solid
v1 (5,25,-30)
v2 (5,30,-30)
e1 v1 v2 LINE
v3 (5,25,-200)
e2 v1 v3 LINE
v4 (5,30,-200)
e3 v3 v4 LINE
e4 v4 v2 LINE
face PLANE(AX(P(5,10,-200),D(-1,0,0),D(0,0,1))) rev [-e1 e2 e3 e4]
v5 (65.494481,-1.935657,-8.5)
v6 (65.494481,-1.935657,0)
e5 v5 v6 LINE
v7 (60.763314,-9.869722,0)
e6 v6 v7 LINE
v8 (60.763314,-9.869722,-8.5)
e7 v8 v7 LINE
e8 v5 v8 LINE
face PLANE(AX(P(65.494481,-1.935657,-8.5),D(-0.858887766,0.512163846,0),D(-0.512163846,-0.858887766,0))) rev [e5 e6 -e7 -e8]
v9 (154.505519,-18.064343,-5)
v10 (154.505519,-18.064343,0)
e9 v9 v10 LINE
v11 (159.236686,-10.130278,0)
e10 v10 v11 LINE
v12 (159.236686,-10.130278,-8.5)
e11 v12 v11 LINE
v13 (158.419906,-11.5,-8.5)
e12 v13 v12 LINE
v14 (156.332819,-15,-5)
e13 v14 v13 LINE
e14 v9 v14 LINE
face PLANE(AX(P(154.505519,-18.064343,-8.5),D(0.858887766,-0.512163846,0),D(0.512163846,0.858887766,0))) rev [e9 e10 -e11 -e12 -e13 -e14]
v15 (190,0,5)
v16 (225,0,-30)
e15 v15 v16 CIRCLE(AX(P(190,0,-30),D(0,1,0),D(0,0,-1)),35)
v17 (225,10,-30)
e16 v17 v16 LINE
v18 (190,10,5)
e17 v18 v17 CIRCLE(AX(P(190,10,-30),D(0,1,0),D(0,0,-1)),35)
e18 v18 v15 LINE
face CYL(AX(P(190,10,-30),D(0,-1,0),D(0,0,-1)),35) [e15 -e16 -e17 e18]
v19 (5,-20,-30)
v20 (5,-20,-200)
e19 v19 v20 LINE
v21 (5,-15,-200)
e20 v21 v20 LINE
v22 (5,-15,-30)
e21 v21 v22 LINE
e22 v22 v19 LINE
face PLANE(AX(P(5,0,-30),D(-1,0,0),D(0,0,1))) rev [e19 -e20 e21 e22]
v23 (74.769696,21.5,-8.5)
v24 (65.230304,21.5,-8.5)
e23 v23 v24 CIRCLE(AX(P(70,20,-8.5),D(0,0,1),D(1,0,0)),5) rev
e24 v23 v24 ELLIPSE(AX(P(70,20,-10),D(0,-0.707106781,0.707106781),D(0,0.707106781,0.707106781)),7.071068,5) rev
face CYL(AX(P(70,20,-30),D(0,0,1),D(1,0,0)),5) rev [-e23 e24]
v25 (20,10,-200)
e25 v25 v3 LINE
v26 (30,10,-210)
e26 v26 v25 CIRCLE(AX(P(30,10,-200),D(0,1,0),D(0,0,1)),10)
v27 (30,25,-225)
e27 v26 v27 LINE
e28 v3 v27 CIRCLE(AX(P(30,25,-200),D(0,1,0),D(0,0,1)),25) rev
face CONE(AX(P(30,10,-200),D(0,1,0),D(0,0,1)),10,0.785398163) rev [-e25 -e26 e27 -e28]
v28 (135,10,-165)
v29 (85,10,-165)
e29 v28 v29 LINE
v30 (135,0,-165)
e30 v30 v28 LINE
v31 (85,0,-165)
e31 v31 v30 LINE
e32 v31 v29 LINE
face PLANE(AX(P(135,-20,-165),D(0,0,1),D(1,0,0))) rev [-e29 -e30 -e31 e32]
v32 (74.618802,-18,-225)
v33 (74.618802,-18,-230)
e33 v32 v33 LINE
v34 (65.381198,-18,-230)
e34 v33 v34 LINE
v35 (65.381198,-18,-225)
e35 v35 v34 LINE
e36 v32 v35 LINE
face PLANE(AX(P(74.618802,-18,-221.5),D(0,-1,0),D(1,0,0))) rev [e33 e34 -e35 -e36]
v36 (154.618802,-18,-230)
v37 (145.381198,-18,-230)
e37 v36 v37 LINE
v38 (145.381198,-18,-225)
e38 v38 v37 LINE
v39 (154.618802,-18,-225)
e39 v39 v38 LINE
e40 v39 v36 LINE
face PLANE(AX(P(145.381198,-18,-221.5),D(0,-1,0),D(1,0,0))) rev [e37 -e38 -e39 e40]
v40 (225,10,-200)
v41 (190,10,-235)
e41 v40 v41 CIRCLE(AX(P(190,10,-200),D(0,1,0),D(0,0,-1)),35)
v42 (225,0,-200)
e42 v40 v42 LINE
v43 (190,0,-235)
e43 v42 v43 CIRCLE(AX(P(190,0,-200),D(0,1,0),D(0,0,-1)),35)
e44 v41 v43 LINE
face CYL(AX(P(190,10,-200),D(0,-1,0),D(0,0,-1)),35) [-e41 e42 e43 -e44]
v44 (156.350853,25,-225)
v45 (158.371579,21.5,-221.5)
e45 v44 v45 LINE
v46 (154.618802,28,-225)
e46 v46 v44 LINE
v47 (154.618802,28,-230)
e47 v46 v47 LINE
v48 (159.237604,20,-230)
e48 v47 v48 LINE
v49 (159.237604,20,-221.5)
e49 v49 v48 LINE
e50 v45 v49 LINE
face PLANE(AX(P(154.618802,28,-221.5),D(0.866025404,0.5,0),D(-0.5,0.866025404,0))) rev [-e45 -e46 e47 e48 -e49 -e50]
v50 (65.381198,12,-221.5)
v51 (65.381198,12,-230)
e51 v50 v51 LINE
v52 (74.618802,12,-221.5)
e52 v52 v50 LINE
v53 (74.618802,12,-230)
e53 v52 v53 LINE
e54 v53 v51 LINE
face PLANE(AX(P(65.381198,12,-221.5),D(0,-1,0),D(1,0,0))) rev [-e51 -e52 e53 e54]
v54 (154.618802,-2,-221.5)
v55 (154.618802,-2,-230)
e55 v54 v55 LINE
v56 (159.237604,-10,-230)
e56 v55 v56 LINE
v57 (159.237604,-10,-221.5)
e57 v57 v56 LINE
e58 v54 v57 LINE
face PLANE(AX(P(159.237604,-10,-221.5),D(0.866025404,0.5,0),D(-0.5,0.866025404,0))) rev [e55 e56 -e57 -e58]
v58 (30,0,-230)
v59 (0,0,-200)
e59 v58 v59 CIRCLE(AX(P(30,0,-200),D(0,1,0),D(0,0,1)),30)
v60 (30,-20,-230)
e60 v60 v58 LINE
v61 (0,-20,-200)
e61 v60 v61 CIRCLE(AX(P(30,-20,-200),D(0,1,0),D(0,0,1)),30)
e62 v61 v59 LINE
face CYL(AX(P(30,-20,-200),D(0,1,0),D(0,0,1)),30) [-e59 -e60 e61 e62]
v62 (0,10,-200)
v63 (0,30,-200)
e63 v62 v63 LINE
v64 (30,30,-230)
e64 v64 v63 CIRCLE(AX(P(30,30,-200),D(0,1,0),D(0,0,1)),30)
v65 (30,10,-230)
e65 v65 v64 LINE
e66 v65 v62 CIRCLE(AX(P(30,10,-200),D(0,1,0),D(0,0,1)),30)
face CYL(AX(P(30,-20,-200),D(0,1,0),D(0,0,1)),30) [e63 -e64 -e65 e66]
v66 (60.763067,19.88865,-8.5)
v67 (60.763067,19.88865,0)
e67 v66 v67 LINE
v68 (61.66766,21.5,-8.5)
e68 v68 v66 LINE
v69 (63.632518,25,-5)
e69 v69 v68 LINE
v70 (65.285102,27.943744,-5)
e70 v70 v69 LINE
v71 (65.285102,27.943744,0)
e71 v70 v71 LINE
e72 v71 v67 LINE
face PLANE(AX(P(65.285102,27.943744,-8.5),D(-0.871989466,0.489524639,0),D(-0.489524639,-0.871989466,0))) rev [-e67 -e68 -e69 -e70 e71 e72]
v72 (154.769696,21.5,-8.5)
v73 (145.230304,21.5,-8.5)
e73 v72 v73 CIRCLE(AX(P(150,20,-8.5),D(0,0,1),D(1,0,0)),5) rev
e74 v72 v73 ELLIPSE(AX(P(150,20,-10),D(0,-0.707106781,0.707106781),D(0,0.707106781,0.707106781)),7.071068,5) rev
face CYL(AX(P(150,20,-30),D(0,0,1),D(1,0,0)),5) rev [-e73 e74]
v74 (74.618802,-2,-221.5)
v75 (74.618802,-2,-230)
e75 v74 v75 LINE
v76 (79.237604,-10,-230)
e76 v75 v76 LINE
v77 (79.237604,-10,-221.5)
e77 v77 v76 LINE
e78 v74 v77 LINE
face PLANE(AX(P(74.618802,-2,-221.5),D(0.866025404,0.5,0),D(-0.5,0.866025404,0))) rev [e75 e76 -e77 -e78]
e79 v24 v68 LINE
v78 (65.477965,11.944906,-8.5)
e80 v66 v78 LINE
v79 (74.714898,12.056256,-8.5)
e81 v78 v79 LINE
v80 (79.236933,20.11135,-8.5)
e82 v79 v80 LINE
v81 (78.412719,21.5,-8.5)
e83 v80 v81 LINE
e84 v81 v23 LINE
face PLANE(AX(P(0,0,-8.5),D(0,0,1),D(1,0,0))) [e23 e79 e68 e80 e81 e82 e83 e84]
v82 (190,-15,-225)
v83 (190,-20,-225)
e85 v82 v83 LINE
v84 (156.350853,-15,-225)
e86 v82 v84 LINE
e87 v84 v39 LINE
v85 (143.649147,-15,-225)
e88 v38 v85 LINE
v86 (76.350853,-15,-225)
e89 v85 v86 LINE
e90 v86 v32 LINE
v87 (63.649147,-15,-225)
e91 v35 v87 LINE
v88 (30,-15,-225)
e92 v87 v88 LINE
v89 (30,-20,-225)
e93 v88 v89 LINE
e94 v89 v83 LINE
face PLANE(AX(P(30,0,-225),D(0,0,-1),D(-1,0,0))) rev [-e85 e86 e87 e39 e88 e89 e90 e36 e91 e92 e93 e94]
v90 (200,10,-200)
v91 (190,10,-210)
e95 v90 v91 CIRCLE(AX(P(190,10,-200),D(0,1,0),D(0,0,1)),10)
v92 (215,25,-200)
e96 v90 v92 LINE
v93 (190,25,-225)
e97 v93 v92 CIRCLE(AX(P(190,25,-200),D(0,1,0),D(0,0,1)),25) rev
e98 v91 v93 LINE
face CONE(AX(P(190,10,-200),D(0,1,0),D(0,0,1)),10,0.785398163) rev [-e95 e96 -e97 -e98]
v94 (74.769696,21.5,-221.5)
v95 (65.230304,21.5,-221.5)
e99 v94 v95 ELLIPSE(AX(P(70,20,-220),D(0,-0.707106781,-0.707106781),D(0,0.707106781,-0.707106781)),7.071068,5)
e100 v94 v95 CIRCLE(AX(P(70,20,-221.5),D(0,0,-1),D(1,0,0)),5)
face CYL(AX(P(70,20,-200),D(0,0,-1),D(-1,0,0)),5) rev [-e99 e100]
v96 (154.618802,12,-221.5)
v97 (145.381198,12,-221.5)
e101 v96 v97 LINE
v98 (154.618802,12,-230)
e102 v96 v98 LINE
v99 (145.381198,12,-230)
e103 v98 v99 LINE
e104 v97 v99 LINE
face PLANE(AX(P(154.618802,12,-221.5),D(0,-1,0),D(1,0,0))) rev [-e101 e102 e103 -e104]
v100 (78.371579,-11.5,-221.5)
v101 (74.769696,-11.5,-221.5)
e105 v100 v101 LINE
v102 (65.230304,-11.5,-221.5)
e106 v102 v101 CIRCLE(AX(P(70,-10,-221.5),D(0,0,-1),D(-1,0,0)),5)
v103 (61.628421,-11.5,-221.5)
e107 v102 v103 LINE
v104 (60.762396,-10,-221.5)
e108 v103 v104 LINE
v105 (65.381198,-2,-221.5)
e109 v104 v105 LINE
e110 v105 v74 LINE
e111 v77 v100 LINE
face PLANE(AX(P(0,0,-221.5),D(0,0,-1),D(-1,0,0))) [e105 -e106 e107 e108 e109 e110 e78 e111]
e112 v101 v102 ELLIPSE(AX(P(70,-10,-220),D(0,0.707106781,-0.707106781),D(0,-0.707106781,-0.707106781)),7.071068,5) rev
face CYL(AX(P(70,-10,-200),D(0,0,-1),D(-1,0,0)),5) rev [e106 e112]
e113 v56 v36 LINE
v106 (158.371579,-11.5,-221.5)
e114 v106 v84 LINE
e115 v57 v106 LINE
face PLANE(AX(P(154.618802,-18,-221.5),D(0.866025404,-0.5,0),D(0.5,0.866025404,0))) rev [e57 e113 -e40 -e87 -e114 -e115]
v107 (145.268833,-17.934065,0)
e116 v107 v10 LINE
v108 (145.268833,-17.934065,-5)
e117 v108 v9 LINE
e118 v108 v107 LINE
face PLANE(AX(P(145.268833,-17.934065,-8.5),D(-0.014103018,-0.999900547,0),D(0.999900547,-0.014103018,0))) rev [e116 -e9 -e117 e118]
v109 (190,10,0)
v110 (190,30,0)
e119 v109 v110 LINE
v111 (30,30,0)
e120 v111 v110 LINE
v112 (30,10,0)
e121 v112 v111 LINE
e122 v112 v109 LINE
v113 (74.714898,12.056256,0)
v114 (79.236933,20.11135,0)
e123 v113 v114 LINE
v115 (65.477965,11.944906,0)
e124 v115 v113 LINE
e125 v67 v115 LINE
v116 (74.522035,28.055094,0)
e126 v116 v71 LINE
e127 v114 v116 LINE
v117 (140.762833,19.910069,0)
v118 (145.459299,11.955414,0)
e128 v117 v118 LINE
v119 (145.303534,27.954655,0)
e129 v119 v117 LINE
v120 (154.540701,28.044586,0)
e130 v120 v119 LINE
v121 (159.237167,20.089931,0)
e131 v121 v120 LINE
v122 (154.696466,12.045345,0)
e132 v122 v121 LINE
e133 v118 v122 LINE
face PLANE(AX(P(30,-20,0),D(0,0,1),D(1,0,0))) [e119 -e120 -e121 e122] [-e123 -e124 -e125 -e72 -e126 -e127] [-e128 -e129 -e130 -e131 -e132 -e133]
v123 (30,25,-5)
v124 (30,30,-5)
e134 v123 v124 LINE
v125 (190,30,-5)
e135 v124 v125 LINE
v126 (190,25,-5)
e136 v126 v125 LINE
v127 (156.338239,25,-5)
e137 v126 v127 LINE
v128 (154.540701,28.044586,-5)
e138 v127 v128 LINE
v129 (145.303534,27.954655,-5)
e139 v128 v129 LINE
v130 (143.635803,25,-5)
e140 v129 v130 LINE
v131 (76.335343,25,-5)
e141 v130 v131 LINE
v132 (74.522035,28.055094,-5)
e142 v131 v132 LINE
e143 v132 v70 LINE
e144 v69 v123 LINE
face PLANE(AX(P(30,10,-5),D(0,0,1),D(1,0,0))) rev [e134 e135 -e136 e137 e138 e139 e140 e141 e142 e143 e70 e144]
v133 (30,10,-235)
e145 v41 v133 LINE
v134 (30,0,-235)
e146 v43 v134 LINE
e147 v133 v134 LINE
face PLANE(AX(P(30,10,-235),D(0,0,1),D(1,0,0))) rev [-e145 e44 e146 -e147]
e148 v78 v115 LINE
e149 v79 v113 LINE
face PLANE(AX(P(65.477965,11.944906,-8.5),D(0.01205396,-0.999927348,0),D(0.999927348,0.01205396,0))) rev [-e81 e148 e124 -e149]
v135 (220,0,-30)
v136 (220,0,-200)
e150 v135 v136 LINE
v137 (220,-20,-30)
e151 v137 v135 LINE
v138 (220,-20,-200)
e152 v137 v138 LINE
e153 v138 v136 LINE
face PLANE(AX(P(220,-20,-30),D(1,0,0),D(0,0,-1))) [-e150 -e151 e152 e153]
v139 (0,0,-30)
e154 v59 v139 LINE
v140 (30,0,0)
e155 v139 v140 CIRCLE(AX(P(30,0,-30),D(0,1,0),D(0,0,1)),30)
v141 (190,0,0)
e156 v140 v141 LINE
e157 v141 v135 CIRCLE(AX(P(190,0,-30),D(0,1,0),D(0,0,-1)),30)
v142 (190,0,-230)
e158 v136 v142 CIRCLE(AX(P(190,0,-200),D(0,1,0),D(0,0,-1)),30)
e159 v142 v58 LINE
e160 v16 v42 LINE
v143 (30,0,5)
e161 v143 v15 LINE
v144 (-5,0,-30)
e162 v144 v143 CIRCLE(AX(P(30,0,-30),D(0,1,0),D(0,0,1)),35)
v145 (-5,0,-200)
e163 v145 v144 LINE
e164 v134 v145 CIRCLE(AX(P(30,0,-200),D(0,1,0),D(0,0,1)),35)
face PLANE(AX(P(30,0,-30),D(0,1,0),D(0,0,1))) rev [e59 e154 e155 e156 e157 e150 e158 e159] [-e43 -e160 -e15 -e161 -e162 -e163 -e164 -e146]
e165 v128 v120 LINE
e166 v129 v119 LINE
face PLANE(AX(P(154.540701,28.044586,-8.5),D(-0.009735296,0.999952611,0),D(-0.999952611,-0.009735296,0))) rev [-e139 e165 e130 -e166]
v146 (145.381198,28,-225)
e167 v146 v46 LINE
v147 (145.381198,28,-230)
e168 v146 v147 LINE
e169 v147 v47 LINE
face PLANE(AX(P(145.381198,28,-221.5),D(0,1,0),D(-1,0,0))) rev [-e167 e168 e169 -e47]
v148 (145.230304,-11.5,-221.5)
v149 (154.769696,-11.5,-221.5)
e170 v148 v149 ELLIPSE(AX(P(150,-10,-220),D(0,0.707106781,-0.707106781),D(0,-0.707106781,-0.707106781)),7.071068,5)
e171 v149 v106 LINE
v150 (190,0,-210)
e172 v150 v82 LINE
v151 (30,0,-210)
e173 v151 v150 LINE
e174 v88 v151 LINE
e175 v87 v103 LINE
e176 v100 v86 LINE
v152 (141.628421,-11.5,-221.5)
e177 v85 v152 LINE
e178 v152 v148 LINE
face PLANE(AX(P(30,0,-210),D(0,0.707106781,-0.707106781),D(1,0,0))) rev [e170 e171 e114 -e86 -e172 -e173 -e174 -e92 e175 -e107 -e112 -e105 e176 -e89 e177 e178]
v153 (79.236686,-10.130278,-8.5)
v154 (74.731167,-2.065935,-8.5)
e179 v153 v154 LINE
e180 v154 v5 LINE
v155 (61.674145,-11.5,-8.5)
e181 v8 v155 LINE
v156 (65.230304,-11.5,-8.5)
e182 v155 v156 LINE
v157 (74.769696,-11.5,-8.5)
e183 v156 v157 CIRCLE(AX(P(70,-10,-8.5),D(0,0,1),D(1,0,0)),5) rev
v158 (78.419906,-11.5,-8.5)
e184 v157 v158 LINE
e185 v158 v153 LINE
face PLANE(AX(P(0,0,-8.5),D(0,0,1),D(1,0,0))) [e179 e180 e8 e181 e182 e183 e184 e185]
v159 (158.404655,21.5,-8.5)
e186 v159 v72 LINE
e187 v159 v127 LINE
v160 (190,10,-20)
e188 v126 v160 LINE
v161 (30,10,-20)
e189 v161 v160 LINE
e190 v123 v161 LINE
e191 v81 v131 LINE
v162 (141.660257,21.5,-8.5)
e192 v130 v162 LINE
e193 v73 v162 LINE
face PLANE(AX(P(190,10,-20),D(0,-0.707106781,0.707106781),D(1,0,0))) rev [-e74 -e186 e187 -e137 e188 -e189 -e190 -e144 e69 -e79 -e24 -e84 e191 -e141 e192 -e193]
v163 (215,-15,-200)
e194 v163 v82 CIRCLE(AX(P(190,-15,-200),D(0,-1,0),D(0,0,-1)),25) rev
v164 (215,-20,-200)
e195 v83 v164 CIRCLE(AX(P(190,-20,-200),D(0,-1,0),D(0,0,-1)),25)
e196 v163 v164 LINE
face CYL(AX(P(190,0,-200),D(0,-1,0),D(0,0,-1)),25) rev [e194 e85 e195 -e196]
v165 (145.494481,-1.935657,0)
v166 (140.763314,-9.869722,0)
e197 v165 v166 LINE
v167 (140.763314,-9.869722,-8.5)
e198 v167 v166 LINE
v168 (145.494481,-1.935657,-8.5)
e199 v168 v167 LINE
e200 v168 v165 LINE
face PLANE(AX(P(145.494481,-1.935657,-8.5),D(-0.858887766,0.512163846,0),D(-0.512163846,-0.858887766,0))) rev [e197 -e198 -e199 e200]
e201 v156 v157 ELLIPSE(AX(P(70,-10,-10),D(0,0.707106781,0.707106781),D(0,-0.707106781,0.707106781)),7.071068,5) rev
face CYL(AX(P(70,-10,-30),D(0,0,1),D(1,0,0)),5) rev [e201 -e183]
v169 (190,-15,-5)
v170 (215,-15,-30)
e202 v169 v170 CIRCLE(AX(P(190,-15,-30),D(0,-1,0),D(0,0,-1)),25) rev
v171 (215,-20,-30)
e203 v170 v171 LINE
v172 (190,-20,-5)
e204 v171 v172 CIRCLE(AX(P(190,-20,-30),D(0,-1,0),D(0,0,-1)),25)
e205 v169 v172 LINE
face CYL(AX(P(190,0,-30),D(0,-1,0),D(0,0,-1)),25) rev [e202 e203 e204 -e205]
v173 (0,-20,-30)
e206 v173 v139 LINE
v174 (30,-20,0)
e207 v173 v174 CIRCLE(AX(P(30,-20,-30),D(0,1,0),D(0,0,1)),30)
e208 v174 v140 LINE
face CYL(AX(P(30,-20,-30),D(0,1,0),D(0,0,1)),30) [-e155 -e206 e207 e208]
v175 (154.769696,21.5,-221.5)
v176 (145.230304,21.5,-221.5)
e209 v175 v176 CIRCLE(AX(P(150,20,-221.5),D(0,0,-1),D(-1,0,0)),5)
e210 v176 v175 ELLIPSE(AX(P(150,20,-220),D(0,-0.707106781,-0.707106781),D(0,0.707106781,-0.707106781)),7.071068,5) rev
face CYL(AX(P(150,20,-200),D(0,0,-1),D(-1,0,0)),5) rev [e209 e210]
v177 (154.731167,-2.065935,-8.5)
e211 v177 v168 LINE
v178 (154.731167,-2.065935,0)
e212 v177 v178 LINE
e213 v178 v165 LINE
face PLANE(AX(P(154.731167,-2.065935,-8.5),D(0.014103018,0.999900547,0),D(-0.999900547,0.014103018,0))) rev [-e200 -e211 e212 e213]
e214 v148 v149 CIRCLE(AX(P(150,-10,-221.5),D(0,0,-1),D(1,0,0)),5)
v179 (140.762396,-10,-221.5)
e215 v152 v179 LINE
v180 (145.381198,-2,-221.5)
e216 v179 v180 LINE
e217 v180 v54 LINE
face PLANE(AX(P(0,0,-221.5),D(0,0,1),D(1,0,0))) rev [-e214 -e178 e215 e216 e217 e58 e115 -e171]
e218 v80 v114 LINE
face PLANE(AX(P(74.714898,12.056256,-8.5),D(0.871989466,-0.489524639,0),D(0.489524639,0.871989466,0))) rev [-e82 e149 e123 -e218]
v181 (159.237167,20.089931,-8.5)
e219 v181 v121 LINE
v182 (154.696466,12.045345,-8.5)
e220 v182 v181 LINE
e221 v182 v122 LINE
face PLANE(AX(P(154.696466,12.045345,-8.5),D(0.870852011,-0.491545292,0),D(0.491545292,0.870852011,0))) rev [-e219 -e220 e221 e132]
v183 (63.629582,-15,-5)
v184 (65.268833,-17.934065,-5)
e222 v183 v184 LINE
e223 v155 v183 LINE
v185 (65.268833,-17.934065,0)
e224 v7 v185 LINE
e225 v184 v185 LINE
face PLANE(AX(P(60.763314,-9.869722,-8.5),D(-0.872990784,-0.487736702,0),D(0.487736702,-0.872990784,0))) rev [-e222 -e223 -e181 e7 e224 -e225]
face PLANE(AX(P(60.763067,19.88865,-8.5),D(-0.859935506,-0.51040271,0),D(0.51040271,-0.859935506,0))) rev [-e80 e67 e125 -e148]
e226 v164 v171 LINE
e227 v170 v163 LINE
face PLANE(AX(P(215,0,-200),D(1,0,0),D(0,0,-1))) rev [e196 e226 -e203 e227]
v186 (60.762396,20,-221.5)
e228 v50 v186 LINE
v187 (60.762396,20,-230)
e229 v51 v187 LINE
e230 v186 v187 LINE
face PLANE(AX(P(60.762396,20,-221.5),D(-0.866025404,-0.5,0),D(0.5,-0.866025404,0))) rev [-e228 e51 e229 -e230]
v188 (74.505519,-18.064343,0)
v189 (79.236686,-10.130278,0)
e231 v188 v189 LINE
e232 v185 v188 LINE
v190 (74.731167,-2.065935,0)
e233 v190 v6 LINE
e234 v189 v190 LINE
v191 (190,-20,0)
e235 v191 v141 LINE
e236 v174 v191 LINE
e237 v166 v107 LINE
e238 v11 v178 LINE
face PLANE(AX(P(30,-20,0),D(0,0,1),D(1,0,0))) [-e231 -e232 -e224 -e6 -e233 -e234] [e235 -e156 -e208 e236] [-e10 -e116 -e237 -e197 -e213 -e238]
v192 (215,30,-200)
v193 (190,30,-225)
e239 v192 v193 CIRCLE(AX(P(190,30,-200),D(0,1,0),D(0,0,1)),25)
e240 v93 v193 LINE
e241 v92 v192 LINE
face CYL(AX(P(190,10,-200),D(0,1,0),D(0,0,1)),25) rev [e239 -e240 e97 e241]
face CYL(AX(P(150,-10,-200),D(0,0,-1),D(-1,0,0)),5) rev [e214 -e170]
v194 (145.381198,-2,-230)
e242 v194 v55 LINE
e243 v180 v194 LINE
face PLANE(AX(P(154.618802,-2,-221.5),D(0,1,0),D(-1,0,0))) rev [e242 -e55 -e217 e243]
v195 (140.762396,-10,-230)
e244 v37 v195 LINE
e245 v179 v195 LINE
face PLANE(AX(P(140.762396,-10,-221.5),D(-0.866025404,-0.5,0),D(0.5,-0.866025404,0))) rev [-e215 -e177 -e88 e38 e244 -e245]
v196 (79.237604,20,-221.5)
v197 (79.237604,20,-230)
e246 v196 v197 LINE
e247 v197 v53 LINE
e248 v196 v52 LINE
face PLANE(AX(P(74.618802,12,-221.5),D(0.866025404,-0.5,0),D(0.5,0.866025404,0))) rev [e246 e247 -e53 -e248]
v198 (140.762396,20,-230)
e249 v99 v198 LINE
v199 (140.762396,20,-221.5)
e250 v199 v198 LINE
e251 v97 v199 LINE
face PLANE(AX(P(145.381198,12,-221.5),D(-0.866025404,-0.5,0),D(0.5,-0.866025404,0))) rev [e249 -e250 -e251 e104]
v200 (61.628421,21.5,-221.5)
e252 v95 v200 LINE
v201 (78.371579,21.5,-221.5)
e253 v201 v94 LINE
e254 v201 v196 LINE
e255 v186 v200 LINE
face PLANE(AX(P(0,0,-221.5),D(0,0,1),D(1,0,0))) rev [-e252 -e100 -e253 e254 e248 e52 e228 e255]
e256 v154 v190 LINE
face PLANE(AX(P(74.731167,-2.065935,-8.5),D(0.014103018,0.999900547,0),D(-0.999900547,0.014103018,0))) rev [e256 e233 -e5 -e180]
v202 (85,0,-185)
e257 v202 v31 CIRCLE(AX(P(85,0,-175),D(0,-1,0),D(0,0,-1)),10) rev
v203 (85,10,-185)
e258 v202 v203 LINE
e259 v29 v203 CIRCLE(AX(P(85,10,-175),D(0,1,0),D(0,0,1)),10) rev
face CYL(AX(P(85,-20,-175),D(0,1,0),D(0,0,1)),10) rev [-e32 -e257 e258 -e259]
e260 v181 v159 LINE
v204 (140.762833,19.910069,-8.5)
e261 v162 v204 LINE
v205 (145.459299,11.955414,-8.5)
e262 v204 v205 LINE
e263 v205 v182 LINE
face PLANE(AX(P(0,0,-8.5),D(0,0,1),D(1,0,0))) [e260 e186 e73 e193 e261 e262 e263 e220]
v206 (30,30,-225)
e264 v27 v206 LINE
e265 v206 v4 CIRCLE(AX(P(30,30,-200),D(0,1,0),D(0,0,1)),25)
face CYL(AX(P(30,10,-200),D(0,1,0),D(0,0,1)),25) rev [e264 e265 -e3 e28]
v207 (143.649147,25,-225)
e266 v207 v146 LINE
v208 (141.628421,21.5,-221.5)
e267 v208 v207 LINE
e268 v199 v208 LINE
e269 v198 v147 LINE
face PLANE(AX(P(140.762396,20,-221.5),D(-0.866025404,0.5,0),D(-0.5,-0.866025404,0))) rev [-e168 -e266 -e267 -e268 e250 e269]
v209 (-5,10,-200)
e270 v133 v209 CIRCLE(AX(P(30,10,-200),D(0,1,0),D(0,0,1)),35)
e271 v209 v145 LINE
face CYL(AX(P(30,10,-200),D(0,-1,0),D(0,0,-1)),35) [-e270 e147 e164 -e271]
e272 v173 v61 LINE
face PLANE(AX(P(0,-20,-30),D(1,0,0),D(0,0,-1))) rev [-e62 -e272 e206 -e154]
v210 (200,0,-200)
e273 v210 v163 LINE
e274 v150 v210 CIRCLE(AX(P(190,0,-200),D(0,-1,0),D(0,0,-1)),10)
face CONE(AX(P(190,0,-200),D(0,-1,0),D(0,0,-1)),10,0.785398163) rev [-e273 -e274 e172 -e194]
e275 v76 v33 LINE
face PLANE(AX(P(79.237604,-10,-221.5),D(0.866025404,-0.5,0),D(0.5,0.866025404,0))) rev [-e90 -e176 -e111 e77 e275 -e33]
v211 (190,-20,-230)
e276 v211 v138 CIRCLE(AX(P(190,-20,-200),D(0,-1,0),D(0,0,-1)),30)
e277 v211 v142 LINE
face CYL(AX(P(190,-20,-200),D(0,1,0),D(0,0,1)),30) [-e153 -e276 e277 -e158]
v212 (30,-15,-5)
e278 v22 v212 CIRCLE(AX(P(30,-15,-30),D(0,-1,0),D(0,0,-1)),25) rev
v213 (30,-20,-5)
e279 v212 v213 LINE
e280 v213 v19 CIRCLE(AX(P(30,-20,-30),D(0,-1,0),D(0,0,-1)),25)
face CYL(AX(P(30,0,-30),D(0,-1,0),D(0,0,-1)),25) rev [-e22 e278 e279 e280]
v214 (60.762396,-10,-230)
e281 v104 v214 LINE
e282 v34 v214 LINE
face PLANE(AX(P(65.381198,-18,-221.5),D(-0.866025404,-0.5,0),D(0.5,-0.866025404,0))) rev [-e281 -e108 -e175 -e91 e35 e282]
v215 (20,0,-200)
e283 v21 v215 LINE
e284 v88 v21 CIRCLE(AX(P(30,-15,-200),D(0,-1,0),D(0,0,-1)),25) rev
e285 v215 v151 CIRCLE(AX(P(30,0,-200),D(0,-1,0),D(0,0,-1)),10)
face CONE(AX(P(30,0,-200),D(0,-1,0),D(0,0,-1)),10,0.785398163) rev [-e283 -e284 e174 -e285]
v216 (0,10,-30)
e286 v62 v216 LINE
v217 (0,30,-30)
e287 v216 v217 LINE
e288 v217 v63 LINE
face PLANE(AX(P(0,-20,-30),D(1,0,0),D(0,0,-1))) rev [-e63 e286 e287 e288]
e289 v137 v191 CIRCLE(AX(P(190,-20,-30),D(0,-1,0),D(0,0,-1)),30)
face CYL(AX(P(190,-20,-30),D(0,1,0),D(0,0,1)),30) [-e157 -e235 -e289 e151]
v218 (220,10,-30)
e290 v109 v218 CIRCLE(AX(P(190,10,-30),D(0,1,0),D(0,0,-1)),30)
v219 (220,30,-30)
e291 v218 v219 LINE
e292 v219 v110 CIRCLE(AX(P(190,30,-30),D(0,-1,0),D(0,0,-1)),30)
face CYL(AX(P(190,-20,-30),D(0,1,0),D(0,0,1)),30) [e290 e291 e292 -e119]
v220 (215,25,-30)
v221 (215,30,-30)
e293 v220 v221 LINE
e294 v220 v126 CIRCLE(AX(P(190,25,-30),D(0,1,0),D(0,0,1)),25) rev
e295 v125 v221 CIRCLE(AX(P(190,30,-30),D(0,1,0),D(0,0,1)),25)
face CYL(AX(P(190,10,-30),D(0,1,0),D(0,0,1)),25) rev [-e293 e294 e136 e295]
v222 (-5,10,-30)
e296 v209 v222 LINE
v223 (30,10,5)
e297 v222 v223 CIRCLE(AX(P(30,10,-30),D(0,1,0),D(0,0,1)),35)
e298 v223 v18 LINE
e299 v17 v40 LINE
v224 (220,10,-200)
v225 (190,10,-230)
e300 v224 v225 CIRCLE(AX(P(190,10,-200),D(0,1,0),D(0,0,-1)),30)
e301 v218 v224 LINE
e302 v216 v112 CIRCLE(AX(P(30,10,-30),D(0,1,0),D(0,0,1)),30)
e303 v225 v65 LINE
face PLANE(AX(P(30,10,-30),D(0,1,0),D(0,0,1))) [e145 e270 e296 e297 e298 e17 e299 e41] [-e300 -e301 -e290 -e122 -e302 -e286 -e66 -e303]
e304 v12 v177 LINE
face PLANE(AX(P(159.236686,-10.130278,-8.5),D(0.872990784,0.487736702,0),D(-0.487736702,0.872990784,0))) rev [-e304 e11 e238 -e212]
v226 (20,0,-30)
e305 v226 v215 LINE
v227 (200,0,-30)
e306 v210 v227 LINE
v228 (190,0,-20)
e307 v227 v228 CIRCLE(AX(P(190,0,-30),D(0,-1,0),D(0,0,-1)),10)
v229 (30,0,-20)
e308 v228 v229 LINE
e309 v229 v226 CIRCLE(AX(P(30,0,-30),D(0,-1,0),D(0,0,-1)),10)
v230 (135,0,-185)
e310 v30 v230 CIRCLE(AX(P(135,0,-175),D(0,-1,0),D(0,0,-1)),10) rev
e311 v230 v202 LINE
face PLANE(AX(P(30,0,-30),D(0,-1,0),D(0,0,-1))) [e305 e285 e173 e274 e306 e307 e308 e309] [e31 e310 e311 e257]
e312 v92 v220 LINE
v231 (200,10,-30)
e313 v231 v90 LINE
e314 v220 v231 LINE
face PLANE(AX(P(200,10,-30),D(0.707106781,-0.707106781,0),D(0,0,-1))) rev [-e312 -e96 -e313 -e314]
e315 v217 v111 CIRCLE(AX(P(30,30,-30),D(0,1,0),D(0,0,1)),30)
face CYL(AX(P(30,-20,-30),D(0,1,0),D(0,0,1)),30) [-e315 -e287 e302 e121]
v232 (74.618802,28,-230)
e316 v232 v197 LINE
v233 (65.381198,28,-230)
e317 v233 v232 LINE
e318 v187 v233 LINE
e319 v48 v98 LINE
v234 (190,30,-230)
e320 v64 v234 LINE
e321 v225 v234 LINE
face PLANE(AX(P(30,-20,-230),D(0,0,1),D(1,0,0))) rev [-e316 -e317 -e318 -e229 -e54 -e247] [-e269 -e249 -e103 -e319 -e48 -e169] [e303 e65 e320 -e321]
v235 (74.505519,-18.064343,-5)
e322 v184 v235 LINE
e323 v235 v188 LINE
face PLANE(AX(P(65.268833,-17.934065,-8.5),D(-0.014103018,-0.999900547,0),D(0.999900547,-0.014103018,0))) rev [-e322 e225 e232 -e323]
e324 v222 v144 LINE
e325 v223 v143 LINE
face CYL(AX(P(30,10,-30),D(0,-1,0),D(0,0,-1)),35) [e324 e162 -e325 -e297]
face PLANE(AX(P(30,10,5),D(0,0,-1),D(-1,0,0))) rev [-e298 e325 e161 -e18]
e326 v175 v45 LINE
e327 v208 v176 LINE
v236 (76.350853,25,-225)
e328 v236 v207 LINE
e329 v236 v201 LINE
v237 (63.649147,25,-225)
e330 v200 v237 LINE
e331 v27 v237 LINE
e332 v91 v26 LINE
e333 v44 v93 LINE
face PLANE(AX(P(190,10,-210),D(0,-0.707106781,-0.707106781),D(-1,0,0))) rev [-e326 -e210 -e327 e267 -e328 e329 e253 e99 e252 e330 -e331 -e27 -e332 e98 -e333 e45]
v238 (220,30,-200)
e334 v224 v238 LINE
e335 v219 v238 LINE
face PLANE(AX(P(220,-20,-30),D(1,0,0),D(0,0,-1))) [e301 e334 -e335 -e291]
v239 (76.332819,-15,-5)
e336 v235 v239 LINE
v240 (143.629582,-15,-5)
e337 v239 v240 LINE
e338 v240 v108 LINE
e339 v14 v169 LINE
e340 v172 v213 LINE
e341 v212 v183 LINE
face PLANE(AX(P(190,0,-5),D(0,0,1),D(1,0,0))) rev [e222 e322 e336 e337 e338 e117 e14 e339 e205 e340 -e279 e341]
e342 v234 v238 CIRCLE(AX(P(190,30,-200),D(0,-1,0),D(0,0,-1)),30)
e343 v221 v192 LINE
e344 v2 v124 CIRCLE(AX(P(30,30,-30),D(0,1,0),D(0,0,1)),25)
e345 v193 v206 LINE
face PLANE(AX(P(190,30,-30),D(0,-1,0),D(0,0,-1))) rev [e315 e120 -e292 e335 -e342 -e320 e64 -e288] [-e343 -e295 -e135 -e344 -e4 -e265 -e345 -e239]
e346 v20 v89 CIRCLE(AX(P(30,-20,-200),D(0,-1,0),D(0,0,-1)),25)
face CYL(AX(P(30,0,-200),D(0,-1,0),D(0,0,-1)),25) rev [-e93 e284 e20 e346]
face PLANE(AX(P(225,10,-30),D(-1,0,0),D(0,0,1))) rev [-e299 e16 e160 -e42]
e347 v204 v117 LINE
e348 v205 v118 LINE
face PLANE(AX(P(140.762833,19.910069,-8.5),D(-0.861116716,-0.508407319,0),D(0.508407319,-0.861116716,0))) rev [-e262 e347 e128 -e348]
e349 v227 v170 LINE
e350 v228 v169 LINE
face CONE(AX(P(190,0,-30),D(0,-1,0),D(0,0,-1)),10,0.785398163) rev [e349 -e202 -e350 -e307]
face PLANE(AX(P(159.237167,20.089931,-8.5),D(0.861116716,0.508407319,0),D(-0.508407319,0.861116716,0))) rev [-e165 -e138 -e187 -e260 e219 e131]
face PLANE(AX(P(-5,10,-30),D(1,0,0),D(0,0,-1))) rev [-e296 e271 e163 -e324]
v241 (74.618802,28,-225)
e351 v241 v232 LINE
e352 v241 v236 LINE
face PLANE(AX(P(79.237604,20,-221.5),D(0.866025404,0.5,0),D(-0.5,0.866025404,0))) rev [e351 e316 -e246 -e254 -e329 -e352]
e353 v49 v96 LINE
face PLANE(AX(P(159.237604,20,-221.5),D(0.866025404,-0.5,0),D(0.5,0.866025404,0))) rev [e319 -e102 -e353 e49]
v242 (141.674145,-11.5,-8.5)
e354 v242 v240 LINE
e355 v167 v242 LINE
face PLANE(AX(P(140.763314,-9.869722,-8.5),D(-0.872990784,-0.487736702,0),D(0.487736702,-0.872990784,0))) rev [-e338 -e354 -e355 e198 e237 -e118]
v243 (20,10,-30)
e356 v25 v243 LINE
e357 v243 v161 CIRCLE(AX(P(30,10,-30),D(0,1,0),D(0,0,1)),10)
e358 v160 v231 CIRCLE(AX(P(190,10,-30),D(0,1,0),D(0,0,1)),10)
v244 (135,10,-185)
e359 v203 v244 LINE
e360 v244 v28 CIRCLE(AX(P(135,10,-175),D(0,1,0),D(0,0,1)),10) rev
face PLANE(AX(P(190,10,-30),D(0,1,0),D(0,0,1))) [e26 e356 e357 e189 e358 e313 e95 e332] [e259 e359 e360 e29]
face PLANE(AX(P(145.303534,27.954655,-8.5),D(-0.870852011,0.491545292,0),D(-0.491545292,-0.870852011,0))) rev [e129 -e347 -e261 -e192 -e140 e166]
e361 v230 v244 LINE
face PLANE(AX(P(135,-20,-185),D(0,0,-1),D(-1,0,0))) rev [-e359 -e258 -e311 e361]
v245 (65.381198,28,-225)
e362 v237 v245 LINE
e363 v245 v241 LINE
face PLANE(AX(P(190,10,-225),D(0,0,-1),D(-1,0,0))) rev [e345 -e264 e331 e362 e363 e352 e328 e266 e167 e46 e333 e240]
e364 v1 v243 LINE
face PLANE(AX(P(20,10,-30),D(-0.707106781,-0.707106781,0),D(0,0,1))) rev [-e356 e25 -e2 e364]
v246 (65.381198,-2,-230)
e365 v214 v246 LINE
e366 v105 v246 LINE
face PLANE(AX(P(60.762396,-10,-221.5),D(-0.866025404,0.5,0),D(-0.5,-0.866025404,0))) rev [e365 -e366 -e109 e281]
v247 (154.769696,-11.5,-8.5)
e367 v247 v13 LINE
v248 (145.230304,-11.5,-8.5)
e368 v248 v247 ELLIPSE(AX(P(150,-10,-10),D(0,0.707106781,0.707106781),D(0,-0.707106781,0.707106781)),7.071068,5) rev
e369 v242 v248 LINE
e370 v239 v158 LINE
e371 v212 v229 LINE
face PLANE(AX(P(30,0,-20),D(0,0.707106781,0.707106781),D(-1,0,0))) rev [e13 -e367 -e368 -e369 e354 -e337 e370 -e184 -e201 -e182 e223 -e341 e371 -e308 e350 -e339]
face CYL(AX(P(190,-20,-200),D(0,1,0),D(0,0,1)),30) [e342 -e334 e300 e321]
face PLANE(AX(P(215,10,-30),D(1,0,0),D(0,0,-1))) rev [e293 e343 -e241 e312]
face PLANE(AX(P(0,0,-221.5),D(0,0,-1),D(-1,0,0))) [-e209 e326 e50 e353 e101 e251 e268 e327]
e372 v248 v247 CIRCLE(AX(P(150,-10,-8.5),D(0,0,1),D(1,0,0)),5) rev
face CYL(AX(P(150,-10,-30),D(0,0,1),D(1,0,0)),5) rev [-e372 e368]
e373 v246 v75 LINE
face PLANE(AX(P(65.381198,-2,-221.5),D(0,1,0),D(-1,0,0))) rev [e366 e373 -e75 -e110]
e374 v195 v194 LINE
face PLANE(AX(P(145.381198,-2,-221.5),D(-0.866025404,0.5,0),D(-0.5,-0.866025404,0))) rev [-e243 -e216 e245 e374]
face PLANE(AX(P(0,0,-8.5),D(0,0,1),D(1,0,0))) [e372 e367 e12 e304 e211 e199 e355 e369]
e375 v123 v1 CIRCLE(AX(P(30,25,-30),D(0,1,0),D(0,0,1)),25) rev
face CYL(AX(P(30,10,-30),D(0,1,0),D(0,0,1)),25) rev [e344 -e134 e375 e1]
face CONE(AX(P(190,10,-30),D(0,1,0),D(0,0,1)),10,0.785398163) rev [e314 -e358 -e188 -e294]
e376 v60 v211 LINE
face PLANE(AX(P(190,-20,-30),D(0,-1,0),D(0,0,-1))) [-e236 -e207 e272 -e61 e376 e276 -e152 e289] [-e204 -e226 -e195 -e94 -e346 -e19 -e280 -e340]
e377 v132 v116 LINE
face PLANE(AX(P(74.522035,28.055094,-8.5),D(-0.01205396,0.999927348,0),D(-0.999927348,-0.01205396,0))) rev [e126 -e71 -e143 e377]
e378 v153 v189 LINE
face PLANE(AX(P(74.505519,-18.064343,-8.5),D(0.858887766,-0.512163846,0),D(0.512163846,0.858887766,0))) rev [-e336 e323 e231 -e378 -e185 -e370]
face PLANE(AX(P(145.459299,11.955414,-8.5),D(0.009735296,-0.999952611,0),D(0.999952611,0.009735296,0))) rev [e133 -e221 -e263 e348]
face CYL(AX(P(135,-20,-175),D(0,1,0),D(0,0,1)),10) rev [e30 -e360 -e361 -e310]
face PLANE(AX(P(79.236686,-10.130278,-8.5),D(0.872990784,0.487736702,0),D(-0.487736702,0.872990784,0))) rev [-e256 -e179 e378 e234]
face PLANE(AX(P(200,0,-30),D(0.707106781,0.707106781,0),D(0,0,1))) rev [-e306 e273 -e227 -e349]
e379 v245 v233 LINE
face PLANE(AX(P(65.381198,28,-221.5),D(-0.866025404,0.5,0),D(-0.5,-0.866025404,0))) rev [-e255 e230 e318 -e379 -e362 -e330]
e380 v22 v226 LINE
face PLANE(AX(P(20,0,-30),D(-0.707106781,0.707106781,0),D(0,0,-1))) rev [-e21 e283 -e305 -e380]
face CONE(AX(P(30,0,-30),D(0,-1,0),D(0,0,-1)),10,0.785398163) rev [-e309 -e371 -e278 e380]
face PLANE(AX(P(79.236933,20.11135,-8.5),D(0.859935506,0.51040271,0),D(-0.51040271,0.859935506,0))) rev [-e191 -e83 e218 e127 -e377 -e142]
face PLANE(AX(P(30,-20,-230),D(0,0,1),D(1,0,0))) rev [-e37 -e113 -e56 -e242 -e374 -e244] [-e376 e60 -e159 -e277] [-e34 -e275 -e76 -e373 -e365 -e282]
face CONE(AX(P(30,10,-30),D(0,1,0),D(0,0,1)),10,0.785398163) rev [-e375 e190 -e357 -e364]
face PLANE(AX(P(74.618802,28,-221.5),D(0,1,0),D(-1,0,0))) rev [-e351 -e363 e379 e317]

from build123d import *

# Parameters (mm, degrees)
BOSS_EXTRUDE1_DEPTH      = 30
BOSS_EXTRUDE1_DEPTH_BACK = 20
BOSS_EXTRUDE2_DEPTH      = 10
SKETCH2_R                = 5
CUT_EXTRUDE1_DEPTH       = 30
CUT_EXTRUDE3_START       = -30
SKETCH3_R                = 5
CUT_EXTRUDE3_DEPTH       = 30
CUT_EXTRUDE5_DEPTH       = 330.165611813
CUT_EXTRUDE7_DEPTH       = 20
CUT_EXTRUDE8_START       = -20
CUT_EXTRUDE8_DEPTH       = 20
CHAMFER7_SIZE            = 15
CUT_EXTRUDE6_DEPTH       = 8.5
SKETCH2_4_R              = 5
CUT_EXTRUDE2_DEPTH       = 8.5


with BuildPart() as part:
    # Sketch1 → Boss-Extrude1 (new, two sides: drawn at the far end of the back side and taken through both)
    with BuildSketch(Plane(origin=(0, 0, 0), x_dir=(1, 0, 0), z_dir=(0, 1, 0)).offset(-BOSS_EXTRUDE1_DEPTH_BACK)):
        with BuildLine():
            Line((30, 0), (190, 0))
            ThreePointArc((190, 0), (211.213203436, 8.786796564), (220, 30))
            Line((220, 30), (220, 200))
            ThreePointArc((220, 200), (211.213203436, 221.213203436), (190, 230))
            Line((190, 230), (30, 230))
            ThreePointArc((30, 230), (8.786796564, 221.213203436), (0, 200))
            Line((0, 200), (0, 30))
            ThreePointArc((0, 30), (8.786796564, 8.786796564), (30, 0))
        make_face()
    extrude(amount=BOSS_EXTRUDE1_DEPTH + BOSS_EXTRUDE1_DEPTH_BACK)

    # Sketch1<3> → Boss-Extrude2 (add)
    with BuildSketch(Plane(origin=(0, 0, 0), x_dir=(1, 0, 0), z_dir=(0, 1, 0))):
        with BuildLine():
            Line((-5, 30), (-5, 200))
            ThreePointArc((-5, 200), (5.251262658, 224.748737342), (30, 235))
            Line((30, 235), (190, 235))
            ThreePointArc((190, 235), (214.748737342, 224.748737342), (225, 200))
            Line((225, 200), (225, 30))
            ThreePointArc((225, 30), (214.748737342, 5.251262658), (190, -5))
            Line((190, -5), (30, -5))
            ThreePointArc((30, -5), (5.251262658, 5.251262658), (-5, 30))
        make_face()
        with BuildLine():
            Line((30, 0), (190, 0))
            ThreePointArc((190, 0), (211.213203436, 8.786796564), (220, 30))
            Line((220, 30), (220, 200))
            ThreePointArc((220, 200), (211.213203436, 221.213203436), (190, 230))
            Line((190, 230), (30, 230))
            ThreePointArc((30, 230), (8.786796564, 221.213203436), (0, 200))
            Line((0, 200), (0, 30))
            ThreePointArc((0, 30), (8.786796564, 8.786796564), (30, 0))
        make_face(mode=Mode.SUBTRACT)
    extrude(amount=BOSS_EXTRUDE2_DEPTH)

    # Sketch2 → Cut-Extrude1 (cut)
    with BuildSketch(Plane(origin=(0, 0, -230), x_dir=(-1, 0, 0), z_dir=(0, 0, -1))):
        with Locations((-150, 20)):
            Circle(SKETCH2_R)
        with Locations(Location((-70, 20, 0), (0, 0, 180))):
            Circle(SKETCH2_R)
        with Locations((-70, -10)):
            Circle(SKETCH2_R)
        with Locations(Location((-150, -10, 0), (0, 0, 180))):
            Circle(SKETCH2_R)
    extrude(amount=-CUT_EXTRUDE1_DEPTH, mode=Mode.SUBTRACT)

    # Sketch3 → Cut-Extrude3 (cut)
    with BuildSketch(Plane.XY.offset(CUT_EXTRUDE3_START)):
        with Locations((70, 20)):
            Circle(SKETCH3_R)
        with Locations(Location((150, 20, 0), (0, 0, 180))):
            Circle(SKETCH3_R)
        with Locations((150, -10)):
            Circle(SKETCH3_R)
        with Locations(Location((70, -10, 0), (0, 0, 180))):
            Circle(SKETCH3_R)
    extrude(amount=CUT_EXTRUDE3_DEPTH, mode=Mode.SUBTRACT)

    # Sketch4 → Cut-Extrude5 (cut, through all)
    with BuildSketch(Plane(origin=(0, 30, 0), x_dir=(1, 0, 0), z_dir=(0, 1, 0))):
        with BuildLine():
            Line((135, 165), (85, 165))
            ThreePointArc((85, 165), (75, 175), (85, 185))
            Line((85, 185), (135, 185))
            ThreePointArc((135, 185), (145, 175), (135, 165))
        make_face()
    extrude(amount=-CUT_EXTRUDE5_DEPTH, mode=Mode.SUBTRACT)

    # Sketch7 → Cut-Extrude7 (cut)
    with BuildSketch(Plane(origin=(0, 30, 0), x_dir=(1, 0, 0), z_dir=(0, 1, 0))):
        with BuildLine():
            Line((215, 30), (215, 200))
            ThreePointArc((215, 200), (207.67766953, 217.67766953), (190, 225))
            Line((190, 225), (30, 225))
            ThreePointArc((30, 225), (12.32233047, 217.67766953), (5, 200))
            Line((5, 200), (5, 30))
            ThreePointArc((5, 30), (12.32233047, 12.32233047), (30, 5))
            Line((30, 5), (190, 5))
            ThreePointArc((190, 5), (207.67766953, 12.32233047), (215, 30))
        make_face()
    extrude(amount=-CUT_EXTRUDE7_DEPTH, mode=Mode.SUBTRACT)

    # Sketch9 → Cut-Extrude8 (cut)
    with BuildSketch(Plane.XZ.offset(20).offset(CUT_EXTRUDE8_START)):
        with BuildLine():
            Line((190, -5), (30, -5))
            ThreePointArc((30, -5), (12.32233047, -12.32233047), (5, -30))
            Line((5, -30), (5, -200))
            ThreePointArc((5, -200), (12.32233047, -217.67766953), (30, -225))
            Line((30, -225), (190, -225))
            ThreePointArc((190, -225), (207.67766953, -217.67766953), (215, -200))
            Line((215, -200), (215, -30))
            ThreePointArc((215, -30), (207.67766953, -12.32233047), (190, -5))
        make_face()
    extrude(amount=CUT_EXTRUDE8_DEPTH, mode=Mode.SUBTRACT)

    # Chamfer7
    # the kernel refuses this chamfer: 15 mm, written as the material it adds along each edge
    with BuildSketch(Plane(origin=(190, 10, -225), x_dir=(0, 0.9996219169112968, -0.02749587661058586), z_dir=(-1, 0, 0))) as chamfer7_piece_1_section:
        Polygon((CHAMFER7_SIZE * 0.999621916911, -CHAMFER7_SIZE * 0.0274958766106), (-CHAMFER7_SIZE * 0.0274958766106, -CHAMFER7_SIZE * 0.999621916911), (0, 0), align=None)
    chamfer7_piece_1 = extrude(amount=160, mode=Mode.PRIVATE)
    chamfer7_piece_1 = chamfer7_piece_1 - Plane(origin=(150, 20, -219.960339284), x_dir=(-1, 0, 0), z_dir=(0, 0, -1)) * Cylinder(5, 380, mode=Mode.PRIVATE)
    chamfer7_piece_1 = chamfer7_piece_1 - Plane(origin=(70, 20, -219.960339284), x_dir=(1, 0, 0), z_dir=(0, 0, -1)) * Cylinder(5, 380, mode=Mode.PRIVATE)
    add(chamfer7_piece_1)
    with BuildSketch(Plane(origin=(30, 10, -5), x_dir=(0, 0.9996219169112968, 0.02749587661058638), z_dir=(1, 0, 0))) as chamfer7_piece_2_section:
        Polygon((CHAMFER7_SIZE * 0.999621916911, -CHAMFER7_SIZE * 0.0274958766106), (-CHAMFER7_SIZE * 0.0274958766106, -CHAMFER7_SIZE * 0.999621916911), (0, 0), align=None)
    chamfer7_piece_2 = extrude(amount=160, mode=Mode.PRIVATE)
    chamfer7_piece_2 = chamfer7_piece_2 - Plane(origin=(70, 20, -10.039660716), x_dir=(1, 0, 0), z_dir=(0, 0, -1)) * Cylinder(5, 380, mode=Mode.PRIVATE)
    chamfer7_piece_2 = chamfer7_piece_2 - Plane(origin=(150, 20, -10.039660716), x_dir=(-1, 0, 0), z_dir=(0, 0, -1)) * Cylinder(5, 380, mode=Mode.PRIVATE)
    add(chamfer7_piece_2)
    with BuildSketch(Plane(origin=(190, 10, -30), x_dir=(0, 0, 1), z_dir=(-1, 0, 0))) as chamfer7_piece_3:
        Polygon((25, CHAMFER7_SIZE), (25 - CHAMFER7_SIZE, 0), (25, 0), align=None)
    revolve(axis=Axis((190, 10, -30), (0, 1, 0)), revolution_arc=90)
    with BuildSketch(Plane(origin=(30, 10, -30), x_dir=(-1, 0, 0), z_dir=(0, 0, -1))) as chamfer7_piece_4:
        Polygon((25, CHAMFER7_SIZE), (25 - CHAMFER7_SIZE, 0), (25, 0), align=None)
    revolve(axis=Axis((30, 10, -30), (0, 1, 0)), revolution_arc=90)
    with BuildSketch(Plane(origin=(5, 10, -200), x_dir=(-0.02749587661058638, 0.9996219169112968, 0), z_dir=(0, 0, 1)), Plane(origin=(215, 10, -30), x_dir=(0.02749587661058586, 0.9996219169112968, 0), z_dir=(0, 0, -1))) as chamfer7_piece_5:
        Polygon((CHAMFER7_SIZE * 0.999621916911, -CHAMFER7_SIZE * 0.0274958766106), (-CHAMFER7_SIZE * 0.0274958766106, -CHAMFER7_SIZE * 0.999621916911), (0, 0), align=None)
    extrude(amount=170)
    with BuildSketch(Plane(origin=(30, 10, -200), x_dir=(0, 0, -1), z_dir=(1, 0, 0))) as chamfer7_piece_6:
        Polygon((25, CHAMFER7_SIZE), (25 - CHAMFER7_SIZE, 0), (25, 0), align=None)
    revolve(axis=Axis((30, 10, -200), (0, 1, 0)), revolution_arc=90)
    with BuildSketch(Plane(origin=(190, 10, -200), x_dir=(1, 0, 0), z_dir=(0, 0, 1))) as chamfer7_piece_7:
        Polygon((25, CHAMFER7_SIZE), (25 - CHAMFER7_SIZE, 0), (25, 0), align=None)
    revolve(axis=Axis((190, 10, -200), (0, 1, 0)), revolution_arc=90)
    with BuildSketch(Plane(origin=(30, 0, -225), x_dir=(0, 0.027495876610586382, 0.9996219169112968), z_dir=(1, 0, 0))) as chamfer7_piece_8_section:
        Polygon((CHAMFER7_SIZE * 0.999621916911, CHAMFER7_SIZE * 0.0274958766106), (-CHAMFER7_SIZE * 0.0274958766106, CHAMFER7_SIZE * 0.999621916911), (0, 0), align=None)
    chamfer7_piece_8 = extrude(amount=160, mode=Mode.PRIVATE)
    chamfer7_piece_8 = chamfer7_piece_8 - Plane(origin=(150, -10, -219.960344511), x_dir=(1, 0, 0), z_dir=(0, 0, -1)) * Cylinder(5, 380, mode=Mode.PRIVATE)
    chamfer7_piece_8 = chamfer7_piece_8 - Plane(origin=(70, -10, -219.960344511), x_dir=(-1, 0, 0), z_dir=(0, 0, -1)) * Cylinder(5, 380, mode=Mode.PRIVATE)
    add(chamfer7_piece_8)
    with BuildSketch(Plane(origin=(190, 0, -5), x_dir=(0, 0.02749587661058637, -0.9996219169112968), z_dir=(-1, 0, 0))) as chamfer7_piece_9_section:
        Polygon((CHAMFER7_SIZE * 0.999621916911, CHAMFER7_SIZE * 0.0274958766106), (-CHAMFER7_SIZE * 0.0274958766106, CHAMFER7_SIZE * 0.999621916911), (0, 0), align=None)
    chamfer7_piece_9 = extrude(amount=160, mode=Mode.PRIVATE)
    chamfer7_piece_9 = chamfer7_piece_9 - Plane(origin=(150, -10, -10.039655489), x_dir=(1, 0, 0), z_dir=(0, 0, -1)) * Cylinder(5, 380, mode=Mode.PRIVATE)
    chamfer7_piece_9 = chamfer7_piece_9 - Plane(origin=(70, -10, -10.039655489), x_dir=(-1, 0, 0), z_dir=(0, 0, -1)) * Cylinder(5, 380, mode=Mode.PRIVATE)
    add(chamfer7_piece_9)
    with BuildSketch(Plane(origin=(30, 0, -30), x_dir=(0, 0, 1), z_dir=(1, 0, 0))) as chamfer7_piece_10:
        Polygon((25 - CHAMFER7_SIZE, 0), (25, CHAMFER7_SIZE), (25, 0), align=None)
    revolve(axis=Axis((30, 0, -30), (0, -1, 0)), revolution_arc=90)
    with BuildSketch(Plane(origin=(190, 0, -30), x_dir=(1, 0, 0), z_dir=(0, 0, -1))) as chamfer7_piece_11:
        Polygon((25 - CHAMFER7_SIZE, 0), (25, CHAMFER7_SIZE), (25, 0), align=None)
    revolve(axis=Axis((190, 0, -30), (0, -1, 0)), revolution_arc=90)
    with BuildSketch(Plane(origin=(215, 0, -200), x_dir=(-0.9996219169112966, 0.02749587661058638, 0), z_dir=(0, 0, 1)), Plane(origin=(5, 0, -30), x_dir=(0.9996219169112966, 0.027495876610586358, 0), z_dir=(0, 0, -1))) as chamfer7_piece_12:
        Polygon((CHAMFER7_SIZE * 0.999621916911, CHAMFER7_SIZE * 0.0274958766106), (-CHAMFER7_SIZE * 0.0274958766106, CHAMFER7_SIZE * 0.999621916911), (0, 0), align=None)
    extrude(amount=170)
    with BuildSketch(Plane(origin=(190, 0, -200), x_dir=(0, 0, -1), z_dir=(-1, 0, 0))) as chamfer7_piece_13:
        Polygon((25 - CHAMFER7_SIZE, 0), (25, CHAMFER7_SIZE), (25, 0), align=None)
    revolve(axis=Axis((190, 0, -200), (0, -1, 0)), revolution_arc=90)
    with BuildSketch(Plane(origin=(30, 0, -200), x_dir=(-1, 0, 0), z_dir=(0, 0, 1))) as chamfer7_piece_14:
        Polygon((25 - CHAMFER7_SIZE, 0), (25, CHAMFER7_SIZE), (25, 0), align=None)
    revolve(axis=Axis((30, 0, -200), (0, -1, 0)), revolution_arc=90)

    # Sketch6 → Cut-Extrude6 (cut)
    with BuildSketch(Plane.XY):
        Polygon((140.762833455, 19.910069191), (145.459299093, 11.955413708), (154.696465638, 12.045344517), (159.237166545, 20.089930809), (154.540700907, 28.044586292), (145.303534362, 27.954655483), align=None)
        Polygon((65.285101729, 27.94374393), (60.76306682, 19.888650286), (65.477965091, 11.944906356), (74.714898271, 12.05625607), (79.23693318, 20.111349714), (74.522034909, 28.055093644), align=None)
        Polygon((140.763314396, -9.869721899), (145.268833053, -17.934065329), (154.505518657, -18.064343431), (159.236685604, -10.130278101), (154.731166947, -2.065934671), (145.494481343, -1.935656569), align=None)
        Polygon((60.763314396, -9.869721899), (65.268833053, -17.934065329), (74.505518657, -18.064343431), (79.236685604, -10.130278101), (74.731166947, -2.065934671), (65.494481343, -1.935656569), align=None)
    extrude(amount=-CUT_EXTRUDE6_DEPTH, mode=Mode.SUBTRACT)

    # Sketch2<4> → Cut-Extrude2 (cut)
    # profile 1 of 4: a face of its own
    with BuildSketch(Plane(origin=(0, 0, -230), x_dir=(-1, 0, 0), z_dir=(0, 0, -1))):
        Polygon((-74.618802154, 12), (-79.237604307, 20), (-74.618802154, 28), (-65.381197846, 28), (-60.762395693, 20), (-65.381197846, 12), align=None)
        with Locations((-70, 20)):
            Circle(SKETCH2_4_R, mode=Mode.SUBTRACT)
    # profile 2 of 4: a face of its own
    with BuildSketch(Plane(origin=(0, 0, -230), x_dir=(-1, 0, 0), z_dir=(0, 0, -1))):
        Polygon((-140.762395693, 20), (-145.381197846, 28), (-154.618802154, 28), (-159.237604307, 20), (-154.618802154, 12), (-145.381197846, 12), align=None)
        with Locations((-150, 20)):
            Circle(SKETCH2_4_R, mode=Mode.SUBTRACT)
    # profile 3 of 4: a face of its own
    with BuildSketch(Plane(origin=(0, 0, -230), x_dir=(-1, 0, 0), z_dir=(0, 0, -1))):
        Polygon((-65.381197846, -2), (-74.618802154, -2), (-79.237604307, -10), (-74.618802154, -18), (-65.381197846, -18), (-60.762395693, -10), align=None)
        with Locations((-70, -10)):
            Circle(SKETCH2_4_R, mode=Mode.SUBTRACT)
    # profile 4 of 4: a face of its own
    with BuildSketch(Plane(origin=(0, 0, -230), x_dir=(-1, 0, 0), z_dir=(0, 0, -1))):
        Polygon((-145.381197846, -2), (-140.762395693, -10), (-145.381197846, -18), (-154.618802154, -18), (-159.237604307, -10), (-154.618802154, -2), align=None)
        with Locations((-150, -10)):
            Circle(SKETCH2_4_R, mode=Mode.SUBTRACT)
    extrude(amount=-CUT_EXTRUDE2_DEPTH, mode=Mode.SUBTRACT)


solid = part.part
